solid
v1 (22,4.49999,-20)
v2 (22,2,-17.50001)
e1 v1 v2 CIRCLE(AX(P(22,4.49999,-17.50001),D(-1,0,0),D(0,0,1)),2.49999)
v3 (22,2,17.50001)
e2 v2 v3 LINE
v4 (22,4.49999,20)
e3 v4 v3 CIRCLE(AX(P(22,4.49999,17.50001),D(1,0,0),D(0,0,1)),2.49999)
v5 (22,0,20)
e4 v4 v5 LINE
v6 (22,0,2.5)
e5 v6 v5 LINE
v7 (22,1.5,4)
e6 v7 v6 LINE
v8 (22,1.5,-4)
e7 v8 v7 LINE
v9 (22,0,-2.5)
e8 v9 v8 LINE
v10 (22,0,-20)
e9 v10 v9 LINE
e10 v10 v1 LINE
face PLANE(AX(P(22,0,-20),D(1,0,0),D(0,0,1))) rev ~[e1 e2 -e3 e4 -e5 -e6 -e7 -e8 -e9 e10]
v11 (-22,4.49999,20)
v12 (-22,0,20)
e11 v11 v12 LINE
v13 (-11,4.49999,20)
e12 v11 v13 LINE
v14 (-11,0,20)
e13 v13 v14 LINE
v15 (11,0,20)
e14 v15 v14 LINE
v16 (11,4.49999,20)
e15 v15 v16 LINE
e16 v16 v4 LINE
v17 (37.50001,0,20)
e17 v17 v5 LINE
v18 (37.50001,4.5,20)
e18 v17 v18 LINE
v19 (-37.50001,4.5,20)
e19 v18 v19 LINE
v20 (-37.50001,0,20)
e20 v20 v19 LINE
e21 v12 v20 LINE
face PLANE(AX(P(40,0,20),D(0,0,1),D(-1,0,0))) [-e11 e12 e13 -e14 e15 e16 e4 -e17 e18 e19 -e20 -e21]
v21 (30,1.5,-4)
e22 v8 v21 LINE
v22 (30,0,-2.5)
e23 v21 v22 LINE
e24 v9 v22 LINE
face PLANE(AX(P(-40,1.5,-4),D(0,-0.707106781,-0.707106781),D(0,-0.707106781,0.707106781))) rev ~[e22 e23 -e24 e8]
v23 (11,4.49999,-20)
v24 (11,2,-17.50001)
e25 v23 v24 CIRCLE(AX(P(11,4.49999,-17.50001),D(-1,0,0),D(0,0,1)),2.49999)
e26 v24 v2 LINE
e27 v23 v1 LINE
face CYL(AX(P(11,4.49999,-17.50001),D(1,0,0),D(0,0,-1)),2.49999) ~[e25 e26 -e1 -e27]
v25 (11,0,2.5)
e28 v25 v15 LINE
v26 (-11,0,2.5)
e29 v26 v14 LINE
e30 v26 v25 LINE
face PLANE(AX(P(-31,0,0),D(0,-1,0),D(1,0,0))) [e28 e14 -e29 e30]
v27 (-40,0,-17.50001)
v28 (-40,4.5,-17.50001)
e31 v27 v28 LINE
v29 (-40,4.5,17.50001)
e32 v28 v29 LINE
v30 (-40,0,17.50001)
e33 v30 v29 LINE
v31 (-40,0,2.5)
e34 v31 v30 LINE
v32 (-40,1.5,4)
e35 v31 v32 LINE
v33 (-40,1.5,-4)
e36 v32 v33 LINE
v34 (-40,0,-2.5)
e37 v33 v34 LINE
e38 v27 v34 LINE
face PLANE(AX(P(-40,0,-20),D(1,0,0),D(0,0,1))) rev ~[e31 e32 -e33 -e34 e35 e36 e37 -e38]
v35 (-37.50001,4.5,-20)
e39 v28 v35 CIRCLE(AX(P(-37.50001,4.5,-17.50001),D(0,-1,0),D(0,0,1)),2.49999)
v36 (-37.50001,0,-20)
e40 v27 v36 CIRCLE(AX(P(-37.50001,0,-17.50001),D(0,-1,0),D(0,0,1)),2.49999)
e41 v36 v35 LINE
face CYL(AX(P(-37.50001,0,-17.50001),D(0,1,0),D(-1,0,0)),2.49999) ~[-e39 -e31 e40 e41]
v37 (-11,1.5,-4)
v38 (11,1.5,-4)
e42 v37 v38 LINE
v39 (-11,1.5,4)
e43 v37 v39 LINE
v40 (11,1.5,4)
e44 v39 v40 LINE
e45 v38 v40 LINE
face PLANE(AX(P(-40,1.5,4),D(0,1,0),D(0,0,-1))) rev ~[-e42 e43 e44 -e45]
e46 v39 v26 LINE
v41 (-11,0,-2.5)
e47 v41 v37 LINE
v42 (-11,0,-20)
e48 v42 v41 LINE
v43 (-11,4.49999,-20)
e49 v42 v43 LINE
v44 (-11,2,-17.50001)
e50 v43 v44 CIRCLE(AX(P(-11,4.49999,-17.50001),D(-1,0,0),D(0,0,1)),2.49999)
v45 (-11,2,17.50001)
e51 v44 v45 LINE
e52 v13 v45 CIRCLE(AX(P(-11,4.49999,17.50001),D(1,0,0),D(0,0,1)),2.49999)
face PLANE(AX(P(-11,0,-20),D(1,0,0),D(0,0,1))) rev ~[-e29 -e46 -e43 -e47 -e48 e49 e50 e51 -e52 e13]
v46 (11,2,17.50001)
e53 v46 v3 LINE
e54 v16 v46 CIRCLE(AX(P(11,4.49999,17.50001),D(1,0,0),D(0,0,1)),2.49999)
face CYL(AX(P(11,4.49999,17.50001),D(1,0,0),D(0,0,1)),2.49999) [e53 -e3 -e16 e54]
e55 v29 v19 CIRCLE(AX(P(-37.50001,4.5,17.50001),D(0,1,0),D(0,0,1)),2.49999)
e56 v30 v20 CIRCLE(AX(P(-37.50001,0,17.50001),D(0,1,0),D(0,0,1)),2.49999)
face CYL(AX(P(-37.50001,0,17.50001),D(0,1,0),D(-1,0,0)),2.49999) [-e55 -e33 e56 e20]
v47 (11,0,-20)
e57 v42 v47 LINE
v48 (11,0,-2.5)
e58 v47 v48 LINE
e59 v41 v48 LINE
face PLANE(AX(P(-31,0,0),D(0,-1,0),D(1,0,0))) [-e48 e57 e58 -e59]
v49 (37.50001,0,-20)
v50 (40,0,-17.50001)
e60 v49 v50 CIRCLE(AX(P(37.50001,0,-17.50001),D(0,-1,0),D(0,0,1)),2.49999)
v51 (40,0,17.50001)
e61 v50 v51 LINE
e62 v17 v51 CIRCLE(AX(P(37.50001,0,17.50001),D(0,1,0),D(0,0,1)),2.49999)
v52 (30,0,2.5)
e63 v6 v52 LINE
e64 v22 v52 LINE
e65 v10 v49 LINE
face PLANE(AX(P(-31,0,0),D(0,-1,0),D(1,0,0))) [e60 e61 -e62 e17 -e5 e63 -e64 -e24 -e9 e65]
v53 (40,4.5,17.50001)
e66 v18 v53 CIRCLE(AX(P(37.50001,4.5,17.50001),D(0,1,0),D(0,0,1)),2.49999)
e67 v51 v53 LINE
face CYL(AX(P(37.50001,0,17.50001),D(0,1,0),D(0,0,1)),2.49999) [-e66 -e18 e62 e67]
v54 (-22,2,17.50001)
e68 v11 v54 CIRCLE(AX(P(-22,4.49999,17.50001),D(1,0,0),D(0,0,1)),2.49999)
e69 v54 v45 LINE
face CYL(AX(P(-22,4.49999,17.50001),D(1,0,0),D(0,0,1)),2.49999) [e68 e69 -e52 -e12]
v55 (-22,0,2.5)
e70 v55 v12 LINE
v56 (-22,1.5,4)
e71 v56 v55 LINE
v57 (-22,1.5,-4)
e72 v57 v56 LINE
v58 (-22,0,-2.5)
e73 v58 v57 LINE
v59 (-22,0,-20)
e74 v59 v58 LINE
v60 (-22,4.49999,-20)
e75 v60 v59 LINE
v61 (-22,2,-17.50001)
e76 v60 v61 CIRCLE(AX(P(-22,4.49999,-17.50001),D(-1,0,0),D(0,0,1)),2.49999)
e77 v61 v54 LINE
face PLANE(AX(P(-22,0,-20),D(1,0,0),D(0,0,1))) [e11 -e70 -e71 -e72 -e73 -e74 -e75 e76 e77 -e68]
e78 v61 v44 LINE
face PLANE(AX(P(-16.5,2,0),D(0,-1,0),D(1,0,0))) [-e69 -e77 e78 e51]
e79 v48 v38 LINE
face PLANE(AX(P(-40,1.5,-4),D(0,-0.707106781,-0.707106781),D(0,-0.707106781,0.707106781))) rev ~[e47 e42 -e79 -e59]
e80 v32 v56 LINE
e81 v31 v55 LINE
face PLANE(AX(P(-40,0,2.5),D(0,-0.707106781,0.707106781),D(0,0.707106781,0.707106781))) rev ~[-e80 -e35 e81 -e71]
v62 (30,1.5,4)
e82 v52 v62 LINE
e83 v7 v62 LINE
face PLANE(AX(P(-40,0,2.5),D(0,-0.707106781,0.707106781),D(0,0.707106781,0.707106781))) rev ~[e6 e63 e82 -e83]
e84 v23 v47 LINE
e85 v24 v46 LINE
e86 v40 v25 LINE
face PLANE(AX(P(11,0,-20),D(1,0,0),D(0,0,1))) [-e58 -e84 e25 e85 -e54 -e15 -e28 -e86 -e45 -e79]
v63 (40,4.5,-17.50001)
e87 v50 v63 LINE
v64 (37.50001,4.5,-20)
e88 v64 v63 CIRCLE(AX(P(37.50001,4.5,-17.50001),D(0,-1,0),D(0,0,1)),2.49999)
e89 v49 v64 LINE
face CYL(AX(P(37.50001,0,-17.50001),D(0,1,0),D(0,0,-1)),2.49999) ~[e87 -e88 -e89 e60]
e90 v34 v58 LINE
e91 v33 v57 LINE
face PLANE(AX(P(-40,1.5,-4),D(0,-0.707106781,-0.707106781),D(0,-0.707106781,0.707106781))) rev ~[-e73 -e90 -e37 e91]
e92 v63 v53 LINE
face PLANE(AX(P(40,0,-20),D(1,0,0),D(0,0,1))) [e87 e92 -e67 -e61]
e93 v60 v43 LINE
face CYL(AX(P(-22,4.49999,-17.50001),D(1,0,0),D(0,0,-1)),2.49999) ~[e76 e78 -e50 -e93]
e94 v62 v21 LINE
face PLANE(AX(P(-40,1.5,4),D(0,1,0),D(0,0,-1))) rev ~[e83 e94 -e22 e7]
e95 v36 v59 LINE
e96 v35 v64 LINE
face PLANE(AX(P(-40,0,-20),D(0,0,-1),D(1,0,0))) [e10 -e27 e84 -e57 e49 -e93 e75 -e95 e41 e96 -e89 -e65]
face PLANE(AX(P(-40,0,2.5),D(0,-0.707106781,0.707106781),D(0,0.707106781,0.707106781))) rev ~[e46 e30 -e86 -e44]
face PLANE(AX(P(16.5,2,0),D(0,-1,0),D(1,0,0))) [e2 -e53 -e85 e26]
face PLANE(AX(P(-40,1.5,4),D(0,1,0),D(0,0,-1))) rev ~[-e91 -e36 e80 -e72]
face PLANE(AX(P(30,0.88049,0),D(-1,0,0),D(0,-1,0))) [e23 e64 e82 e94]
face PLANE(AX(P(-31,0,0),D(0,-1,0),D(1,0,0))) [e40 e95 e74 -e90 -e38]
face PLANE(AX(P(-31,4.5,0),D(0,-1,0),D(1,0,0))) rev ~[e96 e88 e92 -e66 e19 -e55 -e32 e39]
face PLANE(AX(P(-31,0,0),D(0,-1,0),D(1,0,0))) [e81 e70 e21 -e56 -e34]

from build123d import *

# Parameters (mm, degrees)
F0_W     = 18
F0_H     = 40
F0_W_2   = 11
F0_W_3   = 22
F1_DEPTH = 4.5
F2_W     = 11
F2_H     = 40
F3_DEPTH = 2
F5_DEPTH = 70
F6_R     = 2.49999


# Not quite as in the source:
# - a fillet or chamfer is up to 0.001 mm smaller than in the source, because OpenCascade refuses the exact size


with BuildPart() as f1:
    # F0 (on Front) → F1 (new body)
    with BuildSketch(Plane.XZ):
        with Locations((-31, 0)):
            Rectangle(F0_W, F0_H)
        with Locations((-16.5, 0)):
            Rectangle(F0_W_2, F0_H)
        Rectangle(F0_W_3, F0_H)
        with Locations((16.5, 0)):
            Rectangle(F0_W_2, F0_H)
        with Locations((31, 0)):
            Rectangle(F0_W, F0_H)
    extrude(amount=-F1_DEPTH)

    # F2 (on Front) → F3 (cut)
    with BuildSketch(Plane.XZ):
        with Locations((-16.5, 0)):
            Rectangle(F2_W, F2_H)
        with Locations((16.5, 0)):
            Rectangle(F2_W, F2_H)
    extrude(amount=-F3_DEPTH, mode=Mode.SUBTRACT)

    # F4 (on face) → F5 (cut)
    with BuildSketch(Plane(origin=(-40, 0, 0), x_dir=(0, -1, 0), z_dir=(-1, 0, 0))):
        Polygon((0, -2.5), (0, 0), (0, 2.5), (-1.5, 4), (-1.5, 0), (-1.5, -4), align=None)
    extrude(amount=-F5_DEPTH, mode=Mode.SUBTRACT)

    # F6 (radius 2.5 in the source; OpenCascade refuses exactly that, so slightly less here)
    f6_edges = [f1.edges().sort_by_distance(p)[0] for p in [
        (-16.5, 2, 20),
        (16.5, 2, 20),
        (16.5, 2, -20),
        (-16.5, 2, -20),
        (-40, 2.25, 20),
        (-40, 2.25, -20),
        (40, 2.25, -20),
        (40, 2.25, 20),
    ]]
    fillet(f6_edges, radius=F6_R)


solid = f1.part
